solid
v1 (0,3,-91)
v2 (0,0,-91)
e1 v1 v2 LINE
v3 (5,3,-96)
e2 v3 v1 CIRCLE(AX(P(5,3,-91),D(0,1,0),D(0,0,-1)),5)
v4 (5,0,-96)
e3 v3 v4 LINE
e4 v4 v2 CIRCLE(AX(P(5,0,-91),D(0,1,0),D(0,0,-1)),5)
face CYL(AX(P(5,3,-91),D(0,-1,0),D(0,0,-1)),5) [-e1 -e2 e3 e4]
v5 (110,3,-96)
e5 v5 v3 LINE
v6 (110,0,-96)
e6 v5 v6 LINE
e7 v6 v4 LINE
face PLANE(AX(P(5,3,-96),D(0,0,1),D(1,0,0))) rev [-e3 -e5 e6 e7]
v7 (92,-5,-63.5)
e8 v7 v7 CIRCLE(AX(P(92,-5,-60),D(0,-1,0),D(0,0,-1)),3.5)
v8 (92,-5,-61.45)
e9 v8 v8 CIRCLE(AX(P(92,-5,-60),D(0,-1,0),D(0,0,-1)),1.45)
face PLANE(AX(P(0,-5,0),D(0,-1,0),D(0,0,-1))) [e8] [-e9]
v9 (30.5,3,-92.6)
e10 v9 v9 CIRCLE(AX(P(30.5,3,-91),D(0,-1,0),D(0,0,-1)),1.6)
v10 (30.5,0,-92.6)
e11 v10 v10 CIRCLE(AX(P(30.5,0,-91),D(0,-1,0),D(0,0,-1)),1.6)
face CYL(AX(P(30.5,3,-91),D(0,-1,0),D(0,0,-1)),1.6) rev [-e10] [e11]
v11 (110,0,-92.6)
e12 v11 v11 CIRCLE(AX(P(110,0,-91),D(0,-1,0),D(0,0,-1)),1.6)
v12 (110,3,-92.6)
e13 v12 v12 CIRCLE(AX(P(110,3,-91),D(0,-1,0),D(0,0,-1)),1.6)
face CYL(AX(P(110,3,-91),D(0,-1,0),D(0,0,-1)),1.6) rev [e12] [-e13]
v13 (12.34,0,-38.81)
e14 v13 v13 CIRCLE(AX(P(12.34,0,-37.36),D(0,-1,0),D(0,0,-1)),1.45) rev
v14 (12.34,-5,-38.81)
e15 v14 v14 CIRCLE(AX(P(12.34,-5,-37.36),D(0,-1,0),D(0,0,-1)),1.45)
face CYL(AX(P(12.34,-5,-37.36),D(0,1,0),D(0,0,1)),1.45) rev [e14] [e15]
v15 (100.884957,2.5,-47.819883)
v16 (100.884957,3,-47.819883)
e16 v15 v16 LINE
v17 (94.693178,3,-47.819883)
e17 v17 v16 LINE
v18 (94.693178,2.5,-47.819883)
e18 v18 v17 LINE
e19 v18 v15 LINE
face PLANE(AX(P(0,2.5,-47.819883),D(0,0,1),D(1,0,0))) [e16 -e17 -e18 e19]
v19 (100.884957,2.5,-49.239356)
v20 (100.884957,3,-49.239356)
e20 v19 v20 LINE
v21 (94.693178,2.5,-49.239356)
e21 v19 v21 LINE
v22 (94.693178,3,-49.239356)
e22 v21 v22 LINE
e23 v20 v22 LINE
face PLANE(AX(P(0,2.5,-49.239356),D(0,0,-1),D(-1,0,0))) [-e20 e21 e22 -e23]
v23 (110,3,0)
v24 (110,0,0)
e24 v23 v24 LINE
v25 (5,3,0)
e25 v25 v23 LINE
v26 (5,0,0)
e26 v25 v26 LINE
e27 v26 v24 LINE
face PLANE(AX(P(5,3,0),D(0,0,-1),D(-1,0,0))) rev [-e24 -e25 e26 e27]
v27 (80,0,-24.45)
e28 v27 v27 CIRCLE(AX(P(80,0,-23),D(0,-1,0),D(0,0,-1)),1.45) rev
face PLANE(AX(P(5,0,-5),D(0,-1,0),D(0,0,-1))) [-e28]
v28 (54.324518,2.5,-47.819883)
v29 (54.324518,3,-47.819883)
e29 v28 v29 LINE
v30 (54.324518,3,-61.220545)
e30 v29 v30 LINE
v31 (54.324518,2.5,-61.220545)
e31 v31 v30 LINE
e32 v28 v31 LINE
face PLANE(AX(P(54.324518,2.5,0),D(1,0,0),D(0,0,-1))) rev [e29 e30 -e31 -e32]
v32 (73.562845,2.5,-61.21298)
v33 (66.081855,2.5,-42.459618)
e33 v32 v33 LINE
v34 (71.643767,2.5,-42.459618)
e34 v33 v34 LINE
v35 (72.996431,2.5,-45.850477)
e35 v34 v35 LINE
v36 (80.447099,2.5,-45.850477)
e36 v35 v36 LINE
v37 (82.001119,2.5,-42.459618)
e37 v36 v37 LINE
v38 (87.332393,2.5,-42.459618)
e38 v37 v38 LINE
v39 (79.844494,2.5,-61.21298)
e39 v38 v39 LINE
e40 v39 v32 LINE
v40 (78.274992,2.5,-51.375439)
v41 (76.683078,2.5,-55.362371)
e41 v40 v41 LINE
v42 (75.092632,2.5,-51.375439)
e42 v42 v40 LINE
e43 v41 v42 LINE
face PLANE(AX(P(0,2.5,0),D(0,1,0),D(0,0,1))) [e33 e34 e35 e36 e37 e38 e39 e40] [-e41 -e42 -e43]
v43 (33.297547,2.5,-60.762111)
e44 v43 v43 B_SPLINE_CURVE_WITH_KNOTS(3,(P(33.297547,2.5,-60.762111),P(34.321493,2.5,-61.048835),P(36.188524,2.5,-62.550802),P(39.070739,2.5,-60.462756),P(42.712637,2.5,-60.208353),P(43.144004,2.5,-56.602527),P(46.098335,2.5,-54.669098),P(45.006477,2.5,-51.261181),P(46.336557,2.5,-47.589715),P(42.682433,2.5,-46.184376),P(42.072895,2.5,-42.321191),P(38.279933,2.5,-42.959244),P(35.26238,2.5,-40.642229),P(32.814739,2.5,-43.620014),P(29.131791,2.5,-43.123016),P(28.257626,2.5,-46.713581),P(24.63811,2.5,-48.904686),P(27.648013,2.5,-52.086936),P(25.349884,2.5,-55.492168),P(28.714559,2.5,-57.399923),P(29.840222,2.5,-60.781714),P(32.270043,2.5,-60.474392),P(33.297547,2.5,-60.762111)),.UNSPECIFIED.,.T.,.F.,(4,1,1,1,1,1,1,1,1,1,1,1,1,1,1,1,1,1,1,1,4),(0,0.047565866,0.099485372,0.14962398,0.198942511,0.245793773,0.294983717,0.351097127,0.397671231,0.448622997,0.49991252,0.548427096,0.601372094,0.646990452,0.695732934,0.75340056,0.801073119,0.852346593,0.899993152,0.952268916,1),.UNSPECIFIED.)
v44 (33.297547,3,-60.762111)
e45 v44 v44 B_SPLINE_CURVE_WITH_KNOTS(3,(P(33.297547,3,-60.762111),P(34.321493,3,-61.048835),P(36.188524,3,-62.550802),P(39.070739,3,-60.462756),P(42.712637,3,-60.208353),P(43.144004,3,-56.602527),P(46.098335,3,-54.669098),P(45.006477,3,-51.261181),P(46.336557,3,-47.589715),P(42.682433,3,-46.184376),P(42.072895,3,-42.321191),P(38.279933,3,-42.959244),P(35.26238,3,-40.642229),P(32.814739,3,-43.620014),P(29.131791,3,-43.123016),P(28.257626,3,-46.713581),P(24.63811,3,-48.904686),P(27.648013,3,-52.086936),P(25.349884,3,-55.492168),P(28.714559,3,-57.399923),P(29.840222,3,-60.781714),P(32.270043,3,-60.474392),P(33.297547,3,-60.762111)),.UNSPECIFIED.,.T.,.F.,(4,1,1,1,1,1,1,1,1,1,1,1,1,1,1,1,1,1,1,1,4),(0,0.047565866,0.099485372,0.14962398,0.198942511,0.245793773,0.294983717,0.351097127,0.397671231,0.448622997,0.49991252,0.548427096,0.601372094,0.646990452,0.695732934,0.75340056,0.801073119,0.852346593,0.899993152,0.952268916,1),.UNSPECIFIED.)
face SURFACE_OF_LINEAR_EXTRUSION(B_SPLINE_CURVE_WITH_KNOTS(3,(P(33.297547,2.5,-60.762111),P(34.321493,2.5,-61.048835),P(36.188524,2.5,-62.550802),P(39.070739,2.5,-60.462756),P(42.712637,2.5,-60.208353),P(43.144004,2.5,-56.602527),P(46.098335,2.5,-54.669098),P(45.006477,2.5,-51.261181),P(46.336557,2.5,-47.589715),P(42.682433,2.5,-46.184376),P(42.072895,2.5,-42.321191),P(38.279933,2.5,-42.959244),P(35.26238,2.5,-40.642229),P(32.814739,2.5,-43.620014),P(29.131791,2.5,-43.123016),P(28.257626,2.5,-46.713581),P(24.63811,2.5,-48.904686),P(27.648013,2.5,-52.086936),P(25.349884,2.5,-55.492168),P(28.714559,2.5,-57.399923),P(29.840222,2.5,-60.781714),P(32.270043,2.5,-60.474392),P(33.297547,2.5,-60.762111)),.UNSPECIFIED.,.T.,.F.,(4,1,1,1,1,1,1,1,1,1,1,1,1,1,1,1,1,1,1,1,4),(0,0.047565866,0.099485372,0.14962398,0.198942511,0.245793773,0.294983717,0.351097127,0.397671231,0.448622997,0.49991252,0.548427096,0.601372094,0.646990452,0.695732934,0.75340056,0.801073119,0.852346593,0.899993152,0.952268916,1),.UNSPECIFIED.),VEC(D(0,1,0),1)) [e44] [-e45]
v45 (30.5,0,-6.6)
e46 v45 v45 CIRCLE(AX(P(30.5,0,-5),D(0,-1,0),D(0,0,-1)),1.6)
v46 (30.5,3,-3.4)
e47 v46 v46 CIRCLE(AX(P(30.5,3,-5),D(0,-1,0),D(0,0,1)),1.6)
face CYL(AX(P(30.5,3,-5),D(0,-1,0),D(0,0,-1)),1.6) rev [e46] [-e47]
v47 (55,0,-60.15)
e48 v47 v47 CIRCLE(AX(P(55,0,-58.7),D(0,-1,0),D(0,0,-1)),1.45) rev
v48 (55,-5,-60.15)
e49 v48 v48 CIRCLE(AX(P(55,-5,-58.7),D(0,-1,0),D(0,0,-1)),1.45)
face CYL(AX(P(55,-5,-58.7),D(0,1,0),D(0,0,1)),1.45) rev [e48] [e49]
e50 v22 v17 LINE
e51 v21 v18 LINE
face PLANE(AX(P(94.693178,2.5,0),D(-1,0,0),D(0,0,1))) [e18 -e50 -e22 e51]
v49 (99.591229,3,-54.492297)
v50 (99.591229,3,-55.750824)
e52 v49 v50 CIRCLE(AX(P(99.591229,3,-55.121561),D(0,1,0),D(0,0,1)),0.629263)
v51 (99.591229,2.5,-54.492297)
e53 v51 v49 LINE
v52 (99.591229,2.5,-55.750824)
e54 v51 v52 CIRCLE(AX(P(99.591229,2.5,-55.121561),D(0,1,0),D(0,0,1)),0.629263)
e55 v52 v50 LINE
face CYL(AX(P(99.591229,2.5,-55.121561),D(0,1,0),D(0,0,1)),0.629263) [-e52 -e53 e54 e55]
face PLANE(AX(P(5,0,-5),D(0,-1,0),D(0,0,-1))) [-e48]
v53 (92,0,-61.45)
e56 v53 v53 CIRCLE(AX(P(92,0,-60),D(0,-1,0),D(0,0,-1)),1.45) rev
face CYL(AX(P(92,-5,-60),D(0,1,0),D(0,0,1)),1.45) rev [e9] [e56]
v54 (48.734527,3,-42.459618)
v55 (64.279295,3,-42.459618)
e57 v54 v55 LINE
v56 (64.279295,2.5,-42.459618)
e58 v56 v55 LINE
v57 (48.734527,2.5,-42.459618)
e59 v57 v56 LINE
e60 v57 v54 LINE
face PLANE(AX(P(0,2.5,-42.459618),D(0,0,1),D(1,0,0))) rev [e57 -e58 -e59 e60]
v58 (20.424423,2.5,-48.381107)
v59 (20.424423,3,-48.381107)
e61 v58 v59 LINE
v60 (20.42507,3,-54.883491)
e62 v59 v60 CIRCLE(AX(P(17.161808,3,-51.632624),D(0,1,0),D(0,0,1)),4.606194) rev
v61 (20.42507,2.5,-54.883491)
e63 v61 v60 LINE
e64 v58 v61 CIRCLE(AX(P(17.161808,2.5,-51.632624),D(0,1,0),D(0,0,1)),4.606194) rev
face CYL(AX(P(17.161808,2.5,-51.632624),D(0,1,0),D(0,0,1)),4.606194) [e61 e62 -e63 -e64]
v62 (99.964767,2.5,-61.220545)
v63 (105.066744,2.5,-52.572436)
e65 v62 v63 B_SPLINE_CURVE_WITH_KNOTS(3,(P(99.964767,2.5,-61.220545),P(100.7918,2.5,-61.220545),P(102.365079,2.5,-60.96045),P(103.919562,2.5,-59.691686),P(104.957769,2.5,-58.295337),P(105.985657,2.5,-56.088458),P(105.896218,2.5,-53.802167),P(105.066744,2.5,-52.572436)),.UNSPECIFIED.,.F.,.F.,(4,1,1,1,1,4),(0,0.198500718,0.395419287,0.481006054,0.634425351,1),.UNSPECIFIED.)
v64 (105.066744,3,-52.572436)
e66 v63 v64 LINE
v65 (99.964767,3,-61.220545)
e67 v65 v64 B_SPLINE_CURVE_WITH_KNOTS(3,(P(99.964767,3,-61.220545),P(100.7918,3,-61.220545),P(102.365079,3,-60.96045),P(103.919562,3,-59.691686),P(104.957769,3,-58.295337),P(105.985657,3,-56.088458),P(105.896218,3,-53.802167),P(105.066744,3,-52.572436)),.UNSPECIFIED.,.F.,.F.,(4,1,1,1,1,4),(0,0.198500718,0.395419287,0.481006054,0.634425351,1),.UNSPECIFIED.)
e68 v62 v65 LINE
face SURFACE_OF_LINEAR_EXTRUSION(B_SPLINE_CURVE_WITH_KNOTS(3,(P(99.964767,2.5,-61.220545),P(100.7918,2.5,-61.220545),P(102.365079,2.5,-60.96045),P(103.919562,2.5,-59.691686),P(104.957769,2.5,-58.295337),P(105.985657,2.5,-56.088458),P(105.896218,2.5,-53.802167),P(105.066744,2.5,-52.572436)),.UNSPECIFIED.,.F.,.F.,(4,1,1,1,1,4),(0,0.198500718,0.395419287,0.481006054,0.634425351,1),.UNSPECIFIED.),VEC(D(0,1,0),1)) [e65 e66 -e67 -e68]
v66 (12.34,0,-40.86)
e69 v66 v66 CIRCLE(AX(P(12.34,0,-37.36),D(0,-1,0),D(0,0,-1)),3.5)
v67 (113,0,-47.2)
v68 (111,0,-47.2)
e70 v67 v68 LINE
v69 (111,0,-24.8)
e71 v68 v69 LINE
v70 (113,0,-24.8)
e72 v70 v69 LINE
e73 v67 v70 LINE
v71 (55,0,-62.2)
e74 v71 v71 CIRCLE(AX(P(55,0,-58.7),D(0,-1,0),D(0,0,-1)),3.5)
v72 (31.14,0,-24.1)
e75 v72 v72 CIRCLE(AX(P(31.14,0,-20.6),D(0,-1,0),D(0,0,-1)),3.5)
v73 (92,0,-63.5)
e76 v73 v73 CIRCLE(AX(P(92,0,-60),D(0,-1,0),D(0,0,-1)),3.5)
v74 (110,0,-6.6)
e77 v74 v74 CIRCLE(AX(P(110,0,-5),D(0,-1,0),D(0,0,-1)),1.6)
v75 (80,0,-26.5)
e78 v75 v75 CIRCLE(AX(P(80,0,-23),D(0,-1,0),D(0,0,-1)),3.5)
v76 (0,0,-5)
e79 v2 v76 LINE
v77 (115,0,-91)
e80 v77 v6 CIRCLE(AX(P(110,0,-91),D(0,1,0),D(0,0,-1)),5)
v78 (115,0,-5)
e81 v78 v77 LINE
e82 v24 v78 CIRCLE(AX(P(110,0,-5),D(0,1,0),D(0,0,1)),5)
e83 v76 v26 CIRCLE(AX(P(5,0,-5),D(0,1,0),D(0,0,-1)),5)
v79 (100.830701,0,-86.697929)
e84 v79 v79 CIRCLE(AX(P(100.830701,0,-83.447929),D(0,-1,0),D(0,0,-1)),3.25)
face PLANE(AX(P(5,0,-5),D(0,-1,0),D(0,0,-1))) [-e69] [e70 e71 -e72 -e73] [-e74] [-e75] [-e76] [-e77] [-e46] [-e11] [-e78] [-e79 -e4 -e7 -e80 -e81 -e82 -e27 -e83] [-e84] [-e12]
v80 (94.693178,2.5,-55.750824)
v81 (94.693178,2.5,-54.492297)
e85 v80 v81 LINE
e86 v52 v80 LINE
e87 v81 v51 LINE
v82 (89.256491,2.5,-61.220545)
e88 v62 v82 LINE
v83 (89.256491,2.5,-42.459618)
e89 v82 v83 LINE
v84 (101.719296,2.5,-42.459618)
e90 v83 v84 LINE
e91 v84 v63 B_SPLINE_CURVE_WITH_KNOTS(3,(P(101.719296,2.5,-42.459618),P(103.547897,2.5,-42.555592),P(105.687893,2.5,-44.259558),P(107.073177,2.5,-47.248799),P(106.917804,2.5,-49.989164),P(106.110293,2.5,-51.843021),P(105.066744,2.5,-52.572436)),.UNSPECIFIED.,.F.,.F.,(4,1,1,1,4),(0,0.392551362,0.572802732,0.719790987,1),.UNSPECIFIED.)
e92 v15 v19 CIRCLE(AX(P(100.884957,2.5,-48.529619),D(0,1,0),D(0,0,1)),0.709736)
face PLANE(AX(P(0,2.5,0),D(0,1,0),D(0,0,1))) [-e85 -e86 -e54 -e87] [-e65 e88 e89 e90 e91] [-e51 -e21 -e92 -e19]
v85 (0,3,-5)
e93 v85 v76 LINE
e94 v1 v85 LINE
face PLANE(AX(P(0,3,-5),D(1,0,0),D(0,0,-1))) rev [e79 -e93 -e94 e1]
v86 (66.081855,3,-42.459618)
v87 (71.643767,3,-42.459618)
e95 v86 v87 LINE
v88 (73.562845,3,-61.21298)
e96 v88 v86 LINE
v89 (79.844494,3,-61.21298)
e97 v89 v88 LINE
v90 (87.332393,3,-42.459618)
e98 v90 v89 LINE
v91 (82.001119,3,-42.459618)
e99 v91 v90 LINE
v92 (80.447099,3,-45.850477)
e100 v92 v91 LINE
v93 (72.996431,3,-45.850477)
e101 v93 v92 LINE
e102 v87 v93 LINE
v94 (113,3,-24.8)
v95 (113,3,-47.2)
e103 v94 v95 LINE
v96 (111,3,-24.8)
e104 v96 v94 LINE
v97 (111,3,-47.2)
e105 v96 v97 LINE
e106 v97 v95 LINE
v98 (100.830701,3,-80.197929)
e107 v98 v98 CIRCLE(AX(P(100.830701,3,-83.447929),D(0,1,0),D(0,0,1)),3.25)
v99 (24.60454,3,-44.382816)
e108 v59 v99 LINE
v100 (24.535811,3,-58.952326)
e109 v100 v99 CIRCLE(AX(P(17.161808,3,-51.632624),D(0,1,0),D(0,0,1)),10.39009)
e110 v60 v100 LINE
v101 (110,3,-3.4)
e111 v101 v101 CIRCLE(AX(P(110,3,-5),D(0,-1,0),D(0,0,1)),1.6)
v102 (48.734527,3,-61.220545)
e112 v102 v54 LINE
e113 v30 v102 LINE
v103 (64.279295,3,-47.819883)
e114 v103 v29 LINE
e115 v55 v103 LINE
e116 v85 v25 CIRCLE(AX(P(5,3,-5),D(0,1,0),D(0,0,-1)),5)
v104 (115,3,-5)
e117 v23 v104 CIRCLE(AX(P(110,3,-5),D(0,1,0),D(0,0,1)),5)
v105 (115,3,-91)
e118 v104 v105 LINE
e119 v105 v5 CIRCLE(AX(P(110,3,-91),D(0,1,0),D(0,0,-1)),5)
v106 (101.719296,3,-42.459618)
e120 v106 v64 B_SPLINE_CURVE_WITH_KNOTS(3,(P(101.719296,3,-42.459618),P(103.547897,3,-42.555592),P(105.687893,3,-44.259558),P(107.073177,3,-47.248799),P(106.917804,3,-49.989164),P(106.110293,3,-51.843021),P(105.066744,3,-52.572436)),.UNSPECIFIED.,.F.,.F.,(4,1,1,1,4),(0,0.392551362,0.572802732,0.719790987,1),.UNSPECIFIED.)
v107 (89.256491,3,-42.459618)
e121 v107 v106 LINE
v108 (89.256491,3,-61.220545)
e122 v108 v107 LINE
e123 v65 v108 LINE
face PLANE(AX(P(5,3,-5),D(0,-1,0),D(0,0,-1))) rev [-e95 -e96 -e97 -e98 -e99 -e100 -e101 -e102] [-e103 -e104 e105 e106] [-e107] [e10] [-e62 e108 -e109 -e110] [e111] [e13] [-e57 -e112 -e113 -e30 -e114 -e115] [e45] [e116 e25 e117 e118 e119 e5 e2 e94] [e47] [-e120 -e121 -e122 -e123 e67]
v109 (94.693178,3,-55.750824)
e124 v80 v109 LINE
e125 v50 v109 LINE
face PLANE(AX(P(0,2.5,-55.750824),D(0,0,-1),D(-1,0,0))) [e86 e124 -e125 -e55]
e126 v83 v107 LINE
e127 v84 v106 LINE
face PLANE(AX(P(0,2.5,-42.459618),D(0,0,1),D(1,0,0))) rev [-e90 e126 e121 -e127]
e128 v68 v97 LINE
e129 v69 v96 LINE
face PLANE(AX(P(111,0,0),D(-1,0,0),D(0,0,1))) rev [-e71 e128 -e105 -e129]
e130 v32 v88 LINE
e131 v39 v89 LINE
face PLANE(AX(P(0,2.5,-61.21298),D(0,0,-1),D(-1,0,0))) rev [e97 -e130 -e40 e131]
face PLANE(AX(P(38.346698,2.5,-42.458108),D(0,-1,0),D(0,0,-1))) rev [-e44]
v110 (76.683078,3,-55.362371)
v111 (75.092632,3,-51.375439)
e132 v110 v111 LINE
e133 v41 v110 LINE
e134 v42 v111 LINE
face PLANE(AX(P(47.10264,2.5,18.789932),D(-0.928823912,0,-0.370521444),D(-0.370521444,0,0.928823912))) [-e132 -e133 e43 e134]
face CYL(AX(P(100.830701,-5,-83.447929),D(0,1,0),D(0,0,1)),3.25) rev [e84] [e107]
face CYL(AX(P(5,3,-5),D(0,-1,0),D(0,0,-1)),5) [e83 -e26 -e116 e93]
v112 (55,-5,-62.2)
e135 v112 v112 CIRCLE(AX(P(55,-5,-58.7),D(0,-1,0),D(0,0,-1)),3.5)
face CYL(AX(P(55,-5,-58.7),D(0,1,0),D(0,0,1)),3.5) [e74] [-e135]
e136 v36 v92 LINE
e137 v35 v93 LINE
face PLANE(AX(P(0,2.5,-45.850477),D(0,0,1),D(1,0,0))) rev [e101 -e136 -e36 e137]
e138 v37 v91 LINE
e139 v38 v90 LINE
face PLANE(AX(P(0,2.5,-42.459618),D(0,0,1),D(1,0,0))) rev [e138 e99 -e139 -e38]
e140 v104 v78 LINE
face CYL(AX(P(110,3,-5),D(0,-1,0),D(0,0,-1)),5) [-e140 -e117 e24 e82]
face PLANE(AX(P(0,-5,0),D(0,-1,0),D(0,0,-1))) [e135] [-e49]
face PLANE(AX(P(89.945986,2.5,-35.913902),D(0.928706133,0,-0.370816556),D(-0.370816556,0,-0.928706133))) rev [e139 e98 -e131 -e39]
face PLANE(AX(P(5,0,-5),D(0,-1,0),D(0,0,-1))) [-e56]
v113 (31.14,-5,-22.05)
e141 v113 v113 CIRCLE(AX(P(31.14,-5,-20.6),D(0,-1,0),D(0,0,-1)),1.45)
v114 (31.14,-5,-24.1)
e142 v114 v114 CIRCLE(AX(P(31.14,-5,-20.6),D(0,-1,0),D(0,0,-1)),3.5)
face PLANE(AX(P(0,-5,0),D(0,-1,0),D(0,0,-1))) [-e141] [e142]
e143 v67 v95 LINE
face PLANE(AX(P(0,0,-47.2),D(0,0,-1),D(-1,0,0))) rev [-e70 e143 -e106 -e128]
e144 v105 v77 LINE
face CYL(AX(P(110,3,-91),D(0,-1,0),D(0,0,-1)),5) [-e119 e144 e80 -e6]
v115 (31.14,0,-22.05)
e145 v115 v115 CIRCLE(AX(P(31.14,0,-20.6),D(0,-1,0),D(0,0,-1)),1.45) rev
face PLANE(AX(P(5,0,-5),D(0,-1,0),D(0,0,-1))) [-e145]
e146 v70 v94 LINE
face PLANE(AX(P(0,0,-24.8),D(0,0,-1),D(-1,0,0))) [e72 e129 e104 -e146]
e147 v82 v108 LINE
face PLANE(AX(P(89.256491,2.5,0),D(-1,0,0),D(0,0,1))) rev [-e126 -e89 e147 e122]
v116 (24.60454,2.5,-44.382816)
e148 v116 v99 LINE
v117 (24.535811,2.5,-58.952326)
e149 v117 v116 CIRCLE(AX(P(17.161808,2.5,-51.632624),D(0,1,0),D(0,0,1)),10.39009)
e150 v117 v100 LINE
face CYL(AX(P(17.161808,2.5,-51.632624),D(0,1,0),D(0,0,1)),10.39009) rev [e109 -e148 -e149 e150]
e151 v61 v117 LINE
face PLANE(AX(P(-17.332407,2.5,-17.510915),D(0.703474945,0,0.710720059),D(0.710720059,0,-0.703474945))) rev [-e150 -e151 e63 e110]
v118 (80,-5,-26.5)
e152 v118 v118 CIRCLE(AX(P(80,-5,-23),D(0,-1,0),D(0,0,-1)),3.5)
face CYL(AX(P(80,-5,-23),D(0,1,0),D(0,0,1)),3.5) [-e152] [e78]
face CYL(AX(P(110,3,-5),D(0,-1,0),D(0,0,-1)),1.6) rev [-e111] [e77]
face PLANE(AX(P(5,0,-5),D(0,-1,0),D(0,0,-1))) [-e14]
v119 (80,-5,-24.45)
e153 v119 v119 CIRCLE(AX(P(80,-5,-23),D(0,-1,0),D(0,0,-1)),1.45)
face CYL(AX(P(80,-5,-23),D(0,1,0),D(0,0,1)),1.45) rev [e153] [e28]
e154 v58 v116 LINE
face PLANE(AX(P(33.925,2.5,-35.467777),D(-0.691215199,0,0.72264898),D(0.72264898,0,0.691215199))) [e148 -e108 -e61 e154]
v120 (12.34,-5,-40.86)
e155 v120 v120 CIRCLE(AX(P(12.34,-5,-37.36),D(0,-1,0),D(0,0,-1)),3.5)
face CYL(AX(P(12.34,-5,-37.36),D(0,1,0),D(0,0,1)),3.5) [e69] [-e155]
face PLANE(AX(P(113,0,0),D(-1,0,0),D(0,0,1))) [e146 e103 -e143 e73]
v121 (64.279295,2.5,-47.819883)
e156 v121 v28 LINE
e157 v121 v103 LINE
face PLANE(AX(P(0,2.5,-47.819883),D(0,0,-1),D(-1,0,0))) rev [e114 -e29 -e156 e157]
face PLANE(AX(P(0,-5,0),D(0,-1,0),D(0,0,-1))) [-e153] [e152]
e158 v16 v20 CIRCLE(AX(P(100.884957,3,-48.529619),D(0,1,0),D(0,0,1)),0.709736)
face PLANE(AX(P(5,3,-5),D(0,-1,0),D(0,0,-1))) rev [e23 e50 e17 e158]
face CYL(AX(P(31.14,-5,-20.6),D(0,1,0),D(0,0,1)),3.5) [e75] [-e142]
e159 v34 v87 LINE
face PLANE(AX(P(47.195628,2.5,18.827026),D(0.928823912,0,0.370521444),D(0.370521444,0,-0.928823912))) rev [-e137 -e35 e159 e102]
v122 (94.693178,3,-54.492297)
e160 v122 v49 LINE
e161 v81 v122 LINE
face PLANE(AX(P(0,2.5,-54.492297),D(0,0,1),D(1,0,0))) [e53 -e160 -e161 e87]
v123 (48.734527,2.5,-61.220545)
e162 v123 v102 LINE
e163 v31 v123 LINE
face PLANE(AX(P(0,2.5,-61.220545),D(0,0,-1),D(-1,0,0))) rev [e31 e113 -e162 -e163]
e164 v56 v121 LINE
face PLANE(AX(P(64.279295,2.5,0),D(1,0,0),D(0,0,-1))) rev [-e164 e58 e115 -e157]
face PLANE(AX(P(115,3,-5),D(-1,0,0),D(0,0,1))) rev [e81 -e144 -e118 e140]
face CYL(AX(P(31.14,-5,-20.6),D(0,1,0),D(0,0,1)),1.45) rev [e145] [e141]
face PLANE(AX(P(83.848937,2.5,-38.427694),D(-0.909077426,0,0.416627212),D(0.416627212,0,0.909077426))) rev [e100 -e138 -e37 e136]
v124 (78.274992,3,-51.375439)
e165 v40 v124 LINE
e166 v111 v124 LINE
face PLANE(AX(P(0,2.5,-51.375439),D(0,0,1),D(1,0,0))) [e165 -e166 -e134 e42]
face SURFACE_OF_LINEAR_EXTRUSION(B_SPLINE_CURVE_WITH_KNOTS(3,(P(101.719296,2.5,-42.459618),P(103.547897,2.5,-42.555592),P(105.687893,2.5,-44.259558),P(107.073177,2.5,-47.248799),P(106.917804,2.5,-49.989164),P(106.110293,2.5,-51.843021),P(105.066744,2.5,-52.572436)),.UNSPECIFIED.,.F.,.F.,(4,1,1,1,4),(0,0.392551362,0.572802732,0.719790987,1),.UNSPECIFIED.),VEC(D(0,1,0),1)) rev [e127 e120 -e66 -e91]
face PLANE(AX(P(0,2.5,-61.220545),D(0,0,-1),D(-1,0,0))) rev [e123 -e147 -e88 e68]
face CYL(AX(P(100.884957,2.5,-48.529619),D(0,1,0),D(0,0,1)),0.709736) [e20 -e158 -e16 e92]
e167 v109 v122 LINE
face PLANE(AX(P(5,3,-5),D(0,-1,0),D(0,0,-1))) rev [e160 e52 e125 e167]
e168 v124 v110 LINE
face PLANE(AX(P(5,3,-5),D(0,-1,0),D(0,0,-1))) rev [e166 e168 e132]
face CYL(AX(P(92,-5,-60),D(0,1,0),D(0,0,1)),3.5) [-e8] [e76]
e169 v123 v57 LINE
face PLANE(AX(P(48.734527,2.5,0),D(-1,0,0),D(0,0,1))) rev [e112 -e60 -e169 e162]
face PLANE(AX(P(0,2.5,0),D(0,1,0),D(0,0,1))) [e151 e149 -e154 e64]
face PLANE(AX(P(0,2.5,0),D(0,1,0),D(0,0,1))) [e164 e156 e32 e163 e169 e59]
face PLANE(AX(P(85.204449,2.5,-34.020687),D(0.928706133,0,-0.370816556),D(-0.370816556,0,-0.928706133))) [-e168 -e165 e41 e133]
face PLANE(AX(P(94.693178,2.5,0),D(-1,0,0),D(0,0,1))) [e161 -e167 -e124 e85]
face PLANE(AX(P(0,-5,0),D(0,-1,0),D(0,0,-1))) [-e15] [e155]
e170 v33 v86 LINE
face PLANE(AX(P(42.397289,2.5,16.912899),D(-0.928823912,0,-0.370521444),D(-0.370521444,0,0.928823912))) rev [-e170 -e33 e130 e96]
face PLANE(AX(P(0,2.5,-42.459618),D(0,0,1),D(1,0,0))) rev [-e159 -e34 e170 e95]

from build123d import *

# Parameters (mm, degrees)
BOSS_EXTRUDE1_DEPTH     = 3
CUT_EXTRUDE2_DEPTH      = 150.833240638
CUT_EXTRUDE2_DEPTH_BACK = 150.833240638
SKETCH3_R               = 1.6
CUT_EXTRUDE3_DEPTH      = 150.833240638
CUT_EXTRUDE3_DEPTH_BACK = 150.833240638
SKETCH5_W               = 2
SKETCH5_H               = 22.4
SKETCH6_R               = 3.5
SKETCH6_R_2             = 1.45
BOSS_EXTRUDE2_DEPTH     = 5
SKETCH8_R               = 3.25
CUT_EXTRUDE5_DEPTH      = 151.016665741
CUT_EXTRUDE10_START     = -0.5
CUT_EXTRUDE10_DEPTH     = 0.5


# Read off the part's stored shape, not the designer's step: Cut-Extrude10
with BuildPart() as part:
    # Sketch1 → Boss-Extrude1 (new body)
    with BuildSketch(Plane(origin=(0, 0, 0), x_dir=(1, 0, 0), z_dir=(0, 1, 0))):
        with BuildLine():
            Line((5, 0), (110, 0))
            ThreePointArc((110, 0), (113.535533906, 1.464466094), (115, 5))
            Line((115, 5), (115, 91))
            ThreePointArc((115, 91), (113.535533906, 94.535533906), (110, 96))
            Line((110, 96), (5, 96))
            ThreePointArc((5, 96), (1.464466094, 94.535533906), (0, 91))
            Line((0, 91), (0, 5))
            ThreePointArc((0, 5), (1.464466094, 1.464466094), (5, 0))
        make_face()
    extrude(amount=BOSS_EXTRUDE1_DEPTH)

    # Sketch3 → Cut-Extrude2 (cut, two sides: drawn at the far end of the back side and taken through both)
    with BuildSketch(Plane.XZ.offset(-CUT_EXTRUDE2_DEPTH_BACK)):
        with Locations(Location((30.5, -91, 0), (0, 0, 270))):
            Circle(SKETCH3_R)
        with Locations(Location((110, -91, 0), (0, 0, 270))):
            Circle(SKETCH3_R)
        with Locations(Location((110, -5, 0), (0, 0, 270))):
            Circle(SKETCH3_R)
        with Locations(Location((30.5, -5, 0), (0, 0, 270))):
            Circle(SKETCH3_R)
    extrude(amount=CUT_EXTRUDE2_DEPTH + CUT_EXTRUDE2_DEPTH_BACK, mode=Mode.SUBTRACT)

    # Sketch5 → Cut-Extrude3 (cut, two sides: drawn at the far end of the back side and taken through both)
    with BuildSketch(Plane(origin=(0, 3, 0), x_dir=(1, 0, 0), z_dir=(0, 1, 0)).offset(-CUT_EXTRUDE3_DEPTH_BACK)):
        with Locations((112, 36)):
            Rectangle(SKETCH5_W, SKETCH5_H)
    extrude(amount=CUT_EXTRUDE3_DEPTH + CUT_EXTRUDE3_DEPTH_BACK, mode=Mode.SUBTRACT)

    # Sketch6 → Boss-Extrude2 (add)
    # profile 1 of 5: a face of its own
    with BuildSketch(Plane.XZ):
        with Locations(Location((12.34, -37.36, 0), (0, 0, 270))):
            Circle(SKETCH6_R)
        with Locations(Location((12.34, -37.36, 0), (0, 0, 270))):
            Circle(SKETCH6_R_2, mode=Mode.SUBTRACT)
    # profile 2 of 5: a face of its own
    with BuildSketch(Plane.XZ):
        with Locations(Location((31.14, -20.6, 0), (0, 0, 270))):
            Circle(SKETCH6_R)
        with Locations(Location((31.14, -20.6, 0), (0, 0, 270))):
            Circle(SKETCH6_R_2, mode=Mode.SUBTRACT)
    # profile 3 of 5: a face of its own
    with BuildSketch(Plane.XZ):
        with Locations(Location((80, -23, 0), (0, 0, 270))):
            Circle(SKETCH6_R)
        with Locations(Location((80, -23, 0), (0, 0, 270))):
            Circle(SKETCH6_R_2, mode=Mode.SUBTRACT)
    # profile 4 of 5: a face of its own
    with BuildSketch(Plane.XZ):
        with Locations(Location((55, -58.7, 0), (0, 0, 270))):
            Circle(SKETCH6_R)
        with Locations(Location((55, -58.7, 0), (0, 0, 270))):
            Circle(SKETCH6_R_2, mode=Mode.SUBTRACT)
    # profile 5 of 5: a face of its own
    with BuildSketch(Plane.XZ):
        with Locations(Location((92, -60, 0), (0, 0, 270))):
            Circle(SKETCH6_R)
        with Locations(Location((92, -60, 0), (0, 0, 270))):
            Circle(SKETCH6_R_2, mode=Mode.SUBTRACT)
    extrude(amount=BOSS_EXTRUDE2_DEPTH)

    # Sketch8 → Cut-Extrude5 (cut, through all)
    with BuildSketch(Plane(origin=(0, 3, 0), x_dir=(1, 0, 0), z_dir=(0, 1, 0))):
        with Locations(Location((100.830700964, 83.447928687, 0), (0, 0, 270))):
            Circle(SKETCH8_R)
    extrude(amount=-CUT_EXTRUDE5_DEPTH, mode=Mode.SUBTRACT)

    # Cut-Extrude10 outline → Cut-Extrude10 (cut)
    # profile 1 of 5: a face of its own
    with BuildSketch(Plane(origin=(0, 3, 0), x_dir=(1, 0, 0), z_dir=(0, 1, 0)).offset(CUT_EXTRUDE10_START)):
        with BuildLine():
            add(Edge.make_bspline(
                [(33.297546512, 60.762111078), (34.321493225, 61.048834598), (36.18852417, 62.550801835), (39.070738928, 60.462755537), (42.712636812, 60.208352882), (43.144004006, 56.602527257), (46.09833526, 54.669098205), (45.006476912, 51.26118059), (46.336556679, 47.589715296), (42.682432836, 46.184375587), (42.072894551, 42.321191178), (38.279932777, 42.959244425), (35.262379734, 40.642228973), (32.814739239, 43.620013549), (29.131791016, 43.12301619), (28.257625721, 46.713581483), (24.638110416, 48.904686116), (27.648013187, 52.086935615), (25.349884181, 55.492167671), (28.714558965, 57.399923404), (29.840222465, 60.781714479), (32.27004315, 60.474391631), (33.297546512, 60.762111078)],
                knots=[0, 0, 0, 0, 0.047565866, 0.099485372, 0.14962398, 0.198942511, 0.245793773, 0.294983717, 0.351097127, 0.397671231, 0.448622997, 0.49991252, 0.548427096, 0.601372094, 0.646990452, 0.695732934, 0.75340056, 0.801073119, 0.852346593, 0.899993152, 0.952268916, 1, 1, 1, 1], degree=3))
        make_face()
    # profile 2 of 5: a face of its own
    with BuildSketch(Plane(origin=(0, 3, 0), x_dir=(1, 0, 0), z_dir=(0, 1, 0)).offset(CUT_EXTRUDE10_START)):
        with BuildLine():
            add(Edge.make_bspline(
                [(99.964766601, 61.220545167), (100.791800419, 61.220545167), (102.365079498, 60.960449653), (103.919562133, 59.691685536), (104.957768655, 58.295336972), (105.985657449, 56.088458462), (105.896217849, 53.802166915), (105.066743657, 52.572435992)],
                knots=[0, 0, 0, 0, 0.198500718, 0.395419287, 0.481006054, 0.634425351, 1, 1, 1, 1], degree=3))
            Line((99.964766601, 61.220545167), (89.256491407, 61.220545167))
            Line((89.256491407, 61.220545167), (89.256491407, 42.459618206))
            Line((89.256491407, 42.459618206), (101.719296112, 42.459618206))
            add(Edge.make_bspline(
                [(101.719296112, 42.459618206), (103.54789728, 42.555591833), (105.687893164, 44.259558049), (107.07317679, 47.24879867), (106.917803922, 49.989164315), (106.110293292, 51.843021102), (105.066743657, 52.572435992)],
                knots=[0, 0, 0, 0, 0.392551362, 0.572802732, 0.719790987, 1, 1, 1, 1], degree=3))
        make_face()
        with BuildLine():
            Line((100.884956632, 47.819883052), (94.693178468, 47.819883052))
            Line((94.693178468, 47.819883052), (94.693178468, 49.239355876))
            Line((94.693178468, 49.239355876), (100.884956632, 49.239355876))
            ThreePointArc((100.884956632, 49.239355876), (101.594693044, 48.529619464), (100.884956632, 47.819883052))
        make_face(mode=Mode.SUBTRACT)
        with BuildLine():
            Line((94.693178468, 54.49229736), (94.693178468, 55.750824339))
            Line((94.693178468, 55.750824339), (99.591229416, 55.750824339))
            ThreePointArc((99.591229416, 55.750824339), (100.220492906, 55.121560849), (99.591229416, 54.49229736))
            Line((99.591229416, 54.49229736), (94.693178468, 54.49229736))
        make_face(mode=Mode.SUBTRACT)
    # profile 3 of 5: a face of its own
    with BuildSketch(Plane(origin=(0, 3, 0), x_dir=(1, 0, 0), z_dir=(0, 1, 0)).offset(CUT_EXTRUDE10_START)):
        with BuildLine():
            Line((24.604540144, 44.382816286), (20.424423017, 48.381106705))
            ThreePointArc((20.424423017, 48.381106705), (12.555614195, 51.633082316), (20.425070456, 54.883490876))
            Line((20.425070456, 54.883490876), (24.535811062, 58.952326397))
            ThreePointArc((24.535811062, 58.952326397), (6.771833422, 51.583610816), (24.604540144, 44.382816286))
        make_face()
    # profile 4 of 5: a face of its own
    with BuildSketch(Plane(origin=(0, 3, 0), x_dir=(1, 0, 0), z_dir=(0, 1, 0)).offset(CUT_EXTRUDE10_START)):
        Polygon((64.279295174, 47.819883052), (54.324517603, 47.819883052), (54.324517603, 61.220545167), (48.734527121, 61.220545167), (48.734527121, 42.459618206), (64.279295174, 42.459618206), align=None)
    # profile 5 of 5: a face of its own
    with BuildSketch(Plane(origin=(0, 3, 0), x_dir=(1, 0, 0), z_dir=(0, 1, 0)).offset(CUT_EXTRUDE10_START)):
        Polygon((80.447099228, 45.850476979), (82.001118719, 42.459618206), (87.332392702, 42.459618206), (79.844494259, 61.212980487), (73.562845062, 61.212980487), (66.081854559, 42.459618206), (71.643767403, 42.459618206), (72.996430562, 45.850476979), align=None)
        Polygon((76.683077803, 55.362370529), (78.274991903, 51.37543854), (75.09263232, 51.37543854), align=None, mode=Mode.SUBTRACT)
    extrude(amount=CUT_EXTRUDE10_DEPTH, mode=Mode.SUBTRACT)


solid = part.part
